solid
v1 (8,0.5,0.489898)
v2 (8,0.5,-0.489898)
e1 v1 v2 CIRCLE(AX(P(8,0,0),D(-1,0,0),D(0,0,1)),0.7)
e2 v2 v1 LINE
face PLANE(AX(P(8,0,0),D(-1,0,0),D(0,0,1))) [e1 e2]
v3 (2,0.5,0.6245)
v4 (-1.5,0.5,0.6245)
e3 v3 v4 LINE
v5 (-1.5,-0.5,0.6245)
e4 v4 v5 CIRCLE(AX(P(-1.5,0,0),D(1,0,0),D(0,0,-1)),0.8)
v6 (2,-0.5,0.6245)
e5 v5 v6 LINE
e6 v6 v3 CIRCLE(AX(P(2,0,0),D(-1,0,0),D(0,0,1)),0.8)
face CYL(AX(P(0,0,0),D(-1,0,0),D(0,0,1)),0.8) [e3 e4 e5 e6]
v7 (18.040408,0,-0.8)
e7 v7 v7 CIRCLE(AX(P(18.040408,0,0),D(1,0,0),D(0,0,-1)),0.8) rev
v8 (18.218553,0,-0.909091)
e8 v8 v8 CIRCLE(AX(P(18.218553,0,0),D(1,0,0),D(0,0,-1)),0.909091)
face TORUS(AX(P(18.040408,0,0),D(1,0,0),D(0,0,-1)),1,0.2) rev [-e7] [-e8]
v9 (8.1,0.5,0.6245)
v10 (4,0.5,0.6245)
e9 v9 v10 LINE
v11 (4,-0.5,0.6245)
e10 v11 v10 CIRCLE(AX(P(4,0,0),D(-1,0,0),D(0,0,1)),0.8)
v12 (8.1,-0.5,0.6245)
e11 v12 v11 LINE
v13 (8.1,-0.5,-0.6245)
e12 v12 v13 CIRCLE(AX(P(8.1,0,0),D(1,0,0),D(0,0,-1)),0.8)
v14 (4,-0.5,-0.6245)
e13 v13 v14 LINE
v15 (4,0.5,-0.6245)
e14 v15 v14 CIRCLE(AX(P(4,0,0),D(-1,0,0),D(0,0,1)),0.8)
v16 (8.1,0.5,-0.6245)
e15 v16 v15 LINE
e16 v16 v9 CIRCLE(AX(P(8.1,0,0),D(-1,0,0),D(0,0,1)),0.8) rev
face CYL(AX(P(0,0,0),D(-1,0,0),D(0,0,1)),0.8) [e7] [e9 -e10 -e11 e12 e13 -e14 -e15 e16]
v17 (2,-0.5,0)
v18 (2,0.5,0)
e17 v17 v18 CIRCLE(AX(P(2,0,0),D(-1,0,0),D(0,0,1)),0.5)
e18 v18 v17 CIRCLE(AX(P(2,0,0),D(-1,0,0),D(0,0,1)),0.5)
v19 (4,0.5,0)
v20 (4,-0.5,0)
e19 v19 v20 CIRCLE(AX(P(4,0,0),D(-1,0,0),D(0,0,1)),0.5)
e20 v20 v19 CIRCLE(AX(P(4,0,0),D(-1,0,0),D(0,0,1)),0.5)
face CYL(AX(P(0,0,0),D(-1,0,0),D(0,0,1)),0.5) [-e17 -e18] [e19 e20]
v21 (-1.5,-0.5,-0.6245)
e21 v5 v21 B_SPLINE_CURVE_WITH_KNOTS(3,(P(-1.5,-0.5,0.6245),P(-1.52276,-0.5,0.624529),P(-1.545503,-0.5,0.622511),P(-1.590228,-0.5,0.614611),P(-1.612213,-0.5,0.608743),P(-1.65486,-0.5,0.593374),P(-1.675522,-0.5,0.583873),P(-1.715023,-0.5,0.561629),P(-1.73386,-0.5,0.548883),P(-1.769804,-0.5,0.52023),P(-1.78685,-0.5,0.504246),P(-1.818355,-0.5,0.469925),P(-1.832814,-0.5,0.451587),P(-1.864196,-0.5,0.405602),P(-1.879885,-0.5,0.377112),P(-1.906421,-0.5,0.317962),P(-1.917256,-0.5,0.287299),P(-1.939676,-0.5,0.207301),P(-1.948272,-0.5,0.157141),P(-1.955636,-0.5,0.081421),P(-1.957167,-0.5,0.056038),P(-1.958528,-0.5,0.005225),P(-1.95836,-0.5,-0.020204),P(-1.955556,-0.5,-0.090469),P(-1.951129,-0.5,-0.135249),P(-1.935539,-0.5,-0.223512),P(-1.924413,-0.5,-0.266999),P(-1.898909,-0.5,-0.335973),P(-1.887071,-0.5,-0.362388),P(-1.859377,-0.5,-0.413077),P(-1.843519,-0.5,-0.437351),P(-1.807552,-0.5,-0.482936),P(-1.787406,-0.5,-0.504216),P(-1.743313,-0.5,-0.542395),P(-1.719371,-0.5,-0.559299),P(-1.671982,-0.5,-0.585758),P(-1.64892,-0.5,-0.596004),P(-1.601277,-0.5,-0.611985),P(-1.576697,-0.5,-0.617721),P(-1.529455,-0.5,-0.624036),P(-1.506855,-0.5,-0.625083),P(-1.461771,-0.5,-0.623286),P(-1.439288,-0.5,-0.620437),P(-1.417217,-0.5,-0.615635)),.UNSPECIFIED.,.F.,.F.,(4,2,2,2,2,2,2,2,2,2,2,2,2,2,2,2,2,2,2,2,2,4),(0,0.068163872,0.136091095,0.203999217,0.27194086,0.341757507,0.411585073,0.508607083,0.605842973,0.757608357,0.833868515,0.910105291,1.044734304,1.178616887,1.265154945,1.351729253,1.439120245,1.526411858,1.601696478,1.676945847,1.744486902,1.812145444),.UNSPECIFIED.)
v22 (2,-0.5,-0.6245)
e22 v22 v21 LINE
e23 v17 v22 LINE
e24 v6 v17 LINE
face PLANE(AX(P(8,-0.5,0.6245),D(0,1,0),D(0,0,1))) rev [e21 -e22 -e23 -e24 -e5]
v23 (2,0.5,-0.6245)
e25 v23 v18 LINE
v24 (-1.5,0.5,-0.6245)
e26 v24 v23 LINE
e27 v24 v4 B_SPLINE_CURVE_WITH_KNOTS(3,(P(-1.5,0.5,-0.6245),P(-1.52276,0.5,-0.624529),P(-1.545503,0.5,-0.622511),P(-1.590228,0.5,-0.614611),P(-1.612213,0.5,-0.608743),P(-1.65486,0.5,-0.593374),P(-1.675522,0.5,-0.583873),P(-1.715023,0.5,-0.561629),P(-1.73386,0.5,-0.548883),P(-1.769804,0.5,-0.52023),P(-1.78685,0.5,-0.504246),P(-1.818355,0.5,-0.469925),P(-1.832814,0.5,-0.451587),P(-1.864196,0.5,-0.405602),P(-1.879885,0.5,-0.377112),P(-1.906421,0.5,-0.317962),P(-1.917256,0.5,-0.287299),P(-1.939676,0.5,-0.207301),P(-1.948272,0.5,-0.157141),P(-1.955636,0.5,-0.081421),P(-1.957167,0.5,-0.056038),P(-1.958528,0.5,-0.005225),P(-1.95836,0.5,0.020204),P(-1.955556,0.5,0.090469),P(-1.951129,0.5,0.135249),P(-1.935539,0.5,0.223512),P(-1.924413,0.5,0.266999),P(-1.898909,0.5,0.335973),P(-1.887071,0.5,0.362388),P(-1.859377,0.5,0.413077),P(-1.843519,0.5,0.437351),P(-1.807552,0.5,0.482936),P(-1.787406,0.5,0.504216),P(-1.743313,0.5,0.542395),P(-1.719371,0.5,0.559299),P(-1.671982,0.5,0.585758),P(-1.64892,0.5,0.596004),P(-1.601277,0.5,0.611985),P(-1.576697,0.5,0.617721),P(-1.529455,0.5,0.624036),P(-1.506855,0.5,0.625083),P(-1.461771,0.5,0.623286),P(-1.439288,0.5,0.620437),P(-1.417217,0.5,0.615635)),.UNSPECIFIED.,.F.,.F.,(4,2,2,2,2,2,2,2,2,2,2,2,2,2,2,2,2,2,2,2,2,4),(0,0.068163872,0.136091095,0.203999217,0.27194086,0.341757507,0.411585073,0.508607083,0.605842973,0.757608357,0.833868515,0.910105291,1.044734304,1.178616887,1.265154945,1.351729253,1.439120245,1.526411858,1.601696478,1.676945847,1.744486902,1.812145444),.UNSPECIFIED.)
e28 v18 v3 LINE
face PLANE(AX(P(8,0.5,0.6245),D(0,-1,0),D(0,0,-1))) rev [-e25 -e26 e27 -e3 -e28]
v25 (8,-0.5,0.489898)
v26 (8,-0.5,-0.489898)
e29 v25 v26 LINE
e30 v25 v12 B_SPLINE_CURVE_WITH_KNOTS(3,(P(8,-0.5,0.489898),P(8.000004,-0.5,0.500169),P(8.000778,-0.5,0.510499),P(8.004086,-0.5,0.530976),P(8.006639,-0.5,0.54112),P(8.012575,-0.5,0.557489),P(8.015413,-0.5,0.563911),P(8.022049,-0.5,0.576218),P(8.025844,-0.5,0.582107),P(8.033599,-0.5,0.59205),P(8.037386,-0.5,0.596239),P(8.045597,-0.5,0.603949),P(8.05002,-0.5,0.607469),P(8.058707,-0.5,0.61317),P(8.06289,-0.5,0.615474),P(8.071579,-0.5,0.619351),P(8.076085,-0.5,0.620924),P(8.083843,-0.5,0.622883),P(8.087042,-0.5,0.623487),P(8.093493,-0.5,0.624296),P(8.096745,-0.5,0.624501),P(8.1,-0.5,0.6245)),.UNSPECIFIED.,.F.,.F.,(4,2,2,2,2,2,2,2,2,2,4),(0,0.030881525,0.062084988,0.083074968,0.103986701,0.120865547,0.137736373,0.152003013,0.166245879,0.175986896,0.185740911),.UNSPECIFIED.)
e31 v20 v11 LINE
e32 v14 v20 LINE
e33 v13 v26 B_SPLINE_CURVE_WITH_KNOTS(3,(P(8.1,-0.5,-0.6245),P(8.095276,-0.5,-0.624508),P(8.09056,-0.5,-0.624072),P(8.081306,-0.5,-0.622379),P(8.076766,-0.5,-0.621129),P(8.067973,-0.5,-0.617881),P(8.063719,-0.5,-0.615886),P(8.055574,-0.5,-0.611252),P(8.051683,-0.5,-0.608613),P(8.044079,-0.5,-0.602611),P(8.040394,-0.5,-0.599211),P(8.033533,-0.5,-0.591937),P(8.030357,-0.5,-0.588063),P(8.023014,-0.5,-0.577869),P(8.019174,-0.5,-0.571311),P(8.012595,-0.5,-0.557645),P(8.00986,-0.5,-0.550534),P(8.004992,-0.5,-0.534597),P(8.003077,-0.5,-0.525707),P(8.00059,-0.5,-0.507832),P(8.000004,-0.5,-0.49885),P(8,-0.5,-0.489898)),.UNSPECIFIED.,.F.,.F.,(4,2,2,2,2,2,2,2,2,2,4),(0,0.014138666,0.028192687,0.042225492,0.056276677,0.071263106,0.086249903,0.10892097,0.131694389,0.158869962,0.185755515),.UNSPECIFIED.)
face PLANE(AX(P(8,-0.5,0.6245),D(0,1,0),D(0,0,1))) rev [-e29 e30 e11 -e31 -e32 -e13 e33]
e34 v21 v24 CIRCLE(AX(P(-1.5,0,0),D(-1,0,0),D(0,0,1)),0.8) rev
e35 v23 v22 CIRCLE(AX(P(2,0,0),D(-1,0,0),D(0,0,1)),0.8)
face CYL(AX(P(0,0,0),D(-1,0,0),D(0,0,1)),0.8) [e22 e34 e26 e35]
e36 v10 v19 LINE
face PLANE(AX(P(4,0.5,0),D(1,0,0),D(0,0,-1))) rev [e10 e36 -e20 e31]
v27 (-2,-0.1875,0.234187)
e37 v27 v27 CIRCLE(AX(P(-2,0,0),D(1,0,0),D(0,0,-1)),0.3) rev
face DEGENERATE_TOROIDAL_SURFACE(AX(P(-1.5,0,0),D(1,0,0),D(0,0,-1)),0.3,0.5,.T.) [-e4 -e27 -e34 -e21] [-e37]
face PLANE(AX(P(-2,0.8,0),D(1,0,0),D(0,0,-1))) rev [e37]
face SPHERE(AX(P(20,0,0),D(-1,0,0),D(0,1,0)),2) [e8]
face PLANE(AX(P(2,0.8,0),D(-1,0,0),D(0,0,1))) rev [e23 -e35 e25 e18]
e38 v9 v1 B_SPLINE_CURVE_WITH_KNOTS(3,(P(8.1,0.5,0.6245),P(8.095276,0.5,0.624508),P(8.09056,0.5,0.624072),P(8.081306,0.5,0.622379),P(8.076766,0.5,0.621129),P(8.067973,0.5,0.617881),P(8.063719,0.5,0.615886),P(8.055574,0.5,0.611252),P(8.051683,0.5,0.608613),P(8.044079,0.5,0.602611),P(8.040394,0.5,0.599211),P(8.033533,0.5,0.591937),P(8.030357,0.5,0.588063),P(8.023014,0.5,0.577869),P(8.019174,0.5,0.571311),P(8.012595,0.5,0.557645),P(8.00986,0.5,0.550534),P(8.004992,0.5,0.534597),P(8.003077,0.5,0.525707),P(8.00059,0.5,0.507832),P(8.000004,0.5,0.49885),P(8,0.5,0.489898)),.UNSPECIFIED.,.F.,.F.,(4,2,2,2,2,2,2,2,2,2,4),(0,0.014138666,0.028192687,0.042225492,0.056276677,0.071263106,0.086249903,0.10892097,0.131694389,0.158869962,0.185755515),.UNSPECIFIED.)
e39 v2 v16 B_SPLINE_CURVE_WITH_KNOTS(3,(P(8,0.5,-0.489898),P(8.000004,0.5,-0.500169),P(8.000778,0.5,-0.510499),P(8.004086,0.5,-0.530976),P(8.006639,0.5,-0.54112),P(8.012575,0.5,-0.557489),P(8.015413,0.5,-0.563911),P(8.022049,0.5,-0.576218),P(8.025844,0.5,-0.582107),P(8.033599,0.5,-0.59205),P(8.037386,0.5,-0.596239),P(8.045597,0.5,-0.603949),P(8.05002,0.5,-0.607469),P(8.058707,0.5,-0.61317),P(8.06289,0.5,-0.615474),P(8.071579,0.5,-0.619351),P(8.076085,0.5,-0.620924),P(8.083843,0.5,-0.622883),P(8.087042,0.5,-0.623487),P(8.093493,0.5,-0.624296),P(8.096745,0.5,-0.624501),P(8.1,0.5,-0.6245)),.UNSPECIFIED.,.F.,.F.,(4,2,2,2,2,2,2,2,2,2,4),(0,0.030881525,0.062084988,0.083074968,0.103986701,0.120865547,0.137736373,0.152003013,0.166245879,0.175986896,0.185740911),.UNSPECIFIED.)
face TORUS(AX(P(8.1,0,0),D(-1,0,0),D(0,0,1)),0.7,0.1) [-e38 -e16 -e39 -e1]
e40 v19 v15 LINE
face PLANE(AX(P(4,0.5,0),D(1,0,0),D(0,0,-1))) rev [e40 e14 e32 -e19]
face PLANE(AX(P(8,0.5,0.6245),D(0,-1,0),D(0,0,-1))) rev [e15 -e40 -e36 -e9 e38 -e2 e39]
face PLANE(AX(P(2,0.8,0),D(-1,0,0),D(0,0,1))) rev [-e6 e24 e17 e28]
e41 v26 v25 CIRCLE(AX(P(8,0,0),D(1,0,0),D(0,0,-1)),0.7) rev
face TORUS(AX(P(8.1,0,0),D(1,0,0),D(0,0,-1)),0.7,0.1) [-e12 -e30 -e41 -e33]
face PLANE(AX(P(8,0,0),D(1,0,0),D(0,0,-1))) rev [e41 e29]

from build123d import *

# Parameters (mm, degrees)
CUT_EXTRUDE1_START = -10
CUT_EXTRUDE1_DEPTH = 10
FILLET3_R          = 0.2
FILLET3_R_2        = 0.5
FILLET3_R_3        = 0.1


with BuildPart() as part:
    # Sketch1 → Revolve1 (revolve)
    with BuildSketch(Plane.XY, mode=Mode.PRIVATE) as revolve1_sk:
        with BuildLine():
            Line((0, 0.8000000000000004), (2, 0.7999999999999999))
            Line((2, 0.7999999999999999), (2, 0.5))
            Line((2, 0.5), (4, 0.5))
            Line((4, 0.5), (4, 0.7999999999999999))
            Line((4, 0.7999999999999999), (18.166969722017665, 0.7999999999999999))
            ThreePointArc((18.166969722017665, 0.7999999999999999), (20.40861928737844, 1.9578126258614066), (22, 0))
            Line((22, 0), (0, 0))
            Line((0, 0), (-2, 0))
            Line((-2, 0), (-2, 0.7999999999999998))
            Line((-2, 0.7999999999999998), (0, 0.8000000000000004))
        make_face()
    revolve(revolve1_sk.sketch.rotate(Axis((0, 0, 0), (1, 0, 0)), 90), axis=Axis((0, 0, 0), (1, 0, 0)))

    # Sketch2 → Cut-Extrude1 (cut)
    with BuildSketch(Plane.ZY.offset(2).offset(CUT_EXTRUDE1_START)):
        with BuildLine():
            Line((0.6244997998398396, -0.5), (-0.6244997998398398, -0.5))
            ThreePointArc((-0.6244997998398398, -0.5), (-1.3e-16, -0.7999999999999998), (0.6244997998398396, -0.5))
        make_face()
        with BuildLine():
            Line((0.6244997998398396, 0.5), (-0.6244997998398398, 0.5))
            ThreePointArc((-0.6244997998398398, 0.5), (-1.3e-16, 0.7999999999999998), (0.6244997998398396, 0.5))
        make_face()
    extrude(amount=CUT_EXTRUDE1_DEPTH, mode=Mode.SUBTRACT)

    # Fillet3
    # the kernel refuses this fillet: 0.5, 0.2, 0.1 mm, written as the material it adds along each edge
    with BuildSketch(Plane(origin=(18.166969722017665, 0, 0), x_dir=(0, 1.1e-16, 1), z_dir=(0, 1, -1.1e-16))) as fillet3_piece_1:
        with BuildLine():
            CenterArc((0.9999999999999997, -0.1265615162442053), FILLET3_R, 117.03569178941255, 62.96430821058948)
            Line((0.7999999999999996, -0.1265615162442124), (0.8, 0))
            ThreePointArc((0.8, 0), (0.8549345824779961, 0.02496864748320604), (0.9090909090909083, 0.05158319232184283))
        make_face()
    revolve(axis=Axis((18.166969722017665, 0, 0), (1, 0, 0)))
    # the kernel refuses this fillet: 0.5, 0.2, 0.1 mm, written as the material it takes off along each edge
    with BuildSketch(Plane(origin=(-2, 0, 0), x_dir=(0, 0.7854961071297899, -0.6188665976476235), z_dir=(0, -0.6188665976476235, -0.7854961071297899))) as fillet3_2_piece_1:
        with BuildLine():
            CenterArc((0.7999999999999998 - FILLET3_R_2, FILLET3_R_2), FILLET3_R_2, 270, 90)
            Line((0.7999999999999998 - FILLET3_R_2, 0), (0.7999999999999998, 0))
            Line((0.7999999999999998, 0), (0.7999999999999998, FILLET3_R_2))
        make_face()
    revolve(axis=Axis((-2, 0, 0), (1, 0, 0)), revolution_arc=256.4668291762195, mode=Mode.SUBTRACT)
    with BuildSketch(Plane(origin=(-2, 0, 0), x_dir=(0, -0.7854961071297903, 0.6188665976476231), z_dir=(0, 0.6188665976476231, 0.7854961071297903))) as fillet3_2_piece_2:
        with BuildLine():
            CenterArc((0.7999999999999998 - FILLET3_R_2, FILLET3_R_2), FILLET3_R_2, 270, 90)
            Line((0.7999999999999998 - FILLET3_R_2, 0), (0.7999999999999998, 0))
            Line((0.7999999999999998, 0), (0.7999999999999998, FILLET3_R_2))
        make_face()
    revolve(axis=Axis((-2, 0, 0), (1, 0, 0)), revolution_arc=256.46682917621945, mode=Mode.SUBTRACT)
    with BuildSketch(Plane(origin=(8, 6.7e-16, -1.1e-16), x_dir=(0, -0.35458319650881664, -0.9350244685320219), z_dir=(0, 0.9350244685320219, -0.35458319650881664))) as fillet3_2_piece_3_section:
        with BuildLine():
            CenterArc((0.8000000000000002 - FILLET3_R_3, -FILLET3_R_3), FILLET3_R_3, 0, 90)
            Line((0.8000000000000002 - FILLET3_R_3, 0), (0.8000000000000002, 0))
            Line((0.8000000000000002, 0), (0.8000000000000002, -FILLET3_R_3))
        make_face()
    fillet3_2_piece_3 = revolve(axis=Axis((8, 6.7e-16, -1.1e-16), (-1, 0, 0)), revolution_arc=138.4641967481308, mode=Mode.PRIVATE)
    fillet3_2_piece_3 = split(fillet3_2_piece_3, bisect_by=Plane(origin=(8.02822018538669, -0.5, -2.2e-16), z_dir=(0, -1, 0)), keep=Keep.TOP, mode=Mode.PRIVATE)
    add(fillet3_2_piece_3, mode=Mode.SUBTRACT)
    with BuildSketch(Plane(origin=(8, -6.7e-16, -1.1e-16), x_dir=(0, 0.35458319650881664, -0.9350244685320219), z_dir=(0, -0.9350244685320219, -0.35458319650881664))) as fillet3_2_piece_4_section:
        with BuildLine():
            CenterArc((0.8 - FILLET3_R_3, FILLET3_R_3), FILLET3_R_3, 270, 90)
            Line((0.8 - FILLET3_R_3, 0), (0.8, 0))
            Line((0.8, 0), (0.8, FILLET3_R_3))
        make_face()
    fillet3_2_piece_4 = revolve(axis=Axis((8, -6.7e-16, -1.1e-16), (1, 0, 0)), revolution_arc=138.4641967481308, mode=Mode.PRIVATE)
    fillet3_2_piece_4 = split(fillet3_2_piece_4, bisect_by=Plane(origin=(8.02822018538669, 0.5, -2.2e-16), z_dir=(0, 1, 0)), keep=Keep.TOP, mode=Mode.PRIVATE)
    add(fillet3_2_piece_4, mode=Mode.SUBTRACT)


solid = part.part
